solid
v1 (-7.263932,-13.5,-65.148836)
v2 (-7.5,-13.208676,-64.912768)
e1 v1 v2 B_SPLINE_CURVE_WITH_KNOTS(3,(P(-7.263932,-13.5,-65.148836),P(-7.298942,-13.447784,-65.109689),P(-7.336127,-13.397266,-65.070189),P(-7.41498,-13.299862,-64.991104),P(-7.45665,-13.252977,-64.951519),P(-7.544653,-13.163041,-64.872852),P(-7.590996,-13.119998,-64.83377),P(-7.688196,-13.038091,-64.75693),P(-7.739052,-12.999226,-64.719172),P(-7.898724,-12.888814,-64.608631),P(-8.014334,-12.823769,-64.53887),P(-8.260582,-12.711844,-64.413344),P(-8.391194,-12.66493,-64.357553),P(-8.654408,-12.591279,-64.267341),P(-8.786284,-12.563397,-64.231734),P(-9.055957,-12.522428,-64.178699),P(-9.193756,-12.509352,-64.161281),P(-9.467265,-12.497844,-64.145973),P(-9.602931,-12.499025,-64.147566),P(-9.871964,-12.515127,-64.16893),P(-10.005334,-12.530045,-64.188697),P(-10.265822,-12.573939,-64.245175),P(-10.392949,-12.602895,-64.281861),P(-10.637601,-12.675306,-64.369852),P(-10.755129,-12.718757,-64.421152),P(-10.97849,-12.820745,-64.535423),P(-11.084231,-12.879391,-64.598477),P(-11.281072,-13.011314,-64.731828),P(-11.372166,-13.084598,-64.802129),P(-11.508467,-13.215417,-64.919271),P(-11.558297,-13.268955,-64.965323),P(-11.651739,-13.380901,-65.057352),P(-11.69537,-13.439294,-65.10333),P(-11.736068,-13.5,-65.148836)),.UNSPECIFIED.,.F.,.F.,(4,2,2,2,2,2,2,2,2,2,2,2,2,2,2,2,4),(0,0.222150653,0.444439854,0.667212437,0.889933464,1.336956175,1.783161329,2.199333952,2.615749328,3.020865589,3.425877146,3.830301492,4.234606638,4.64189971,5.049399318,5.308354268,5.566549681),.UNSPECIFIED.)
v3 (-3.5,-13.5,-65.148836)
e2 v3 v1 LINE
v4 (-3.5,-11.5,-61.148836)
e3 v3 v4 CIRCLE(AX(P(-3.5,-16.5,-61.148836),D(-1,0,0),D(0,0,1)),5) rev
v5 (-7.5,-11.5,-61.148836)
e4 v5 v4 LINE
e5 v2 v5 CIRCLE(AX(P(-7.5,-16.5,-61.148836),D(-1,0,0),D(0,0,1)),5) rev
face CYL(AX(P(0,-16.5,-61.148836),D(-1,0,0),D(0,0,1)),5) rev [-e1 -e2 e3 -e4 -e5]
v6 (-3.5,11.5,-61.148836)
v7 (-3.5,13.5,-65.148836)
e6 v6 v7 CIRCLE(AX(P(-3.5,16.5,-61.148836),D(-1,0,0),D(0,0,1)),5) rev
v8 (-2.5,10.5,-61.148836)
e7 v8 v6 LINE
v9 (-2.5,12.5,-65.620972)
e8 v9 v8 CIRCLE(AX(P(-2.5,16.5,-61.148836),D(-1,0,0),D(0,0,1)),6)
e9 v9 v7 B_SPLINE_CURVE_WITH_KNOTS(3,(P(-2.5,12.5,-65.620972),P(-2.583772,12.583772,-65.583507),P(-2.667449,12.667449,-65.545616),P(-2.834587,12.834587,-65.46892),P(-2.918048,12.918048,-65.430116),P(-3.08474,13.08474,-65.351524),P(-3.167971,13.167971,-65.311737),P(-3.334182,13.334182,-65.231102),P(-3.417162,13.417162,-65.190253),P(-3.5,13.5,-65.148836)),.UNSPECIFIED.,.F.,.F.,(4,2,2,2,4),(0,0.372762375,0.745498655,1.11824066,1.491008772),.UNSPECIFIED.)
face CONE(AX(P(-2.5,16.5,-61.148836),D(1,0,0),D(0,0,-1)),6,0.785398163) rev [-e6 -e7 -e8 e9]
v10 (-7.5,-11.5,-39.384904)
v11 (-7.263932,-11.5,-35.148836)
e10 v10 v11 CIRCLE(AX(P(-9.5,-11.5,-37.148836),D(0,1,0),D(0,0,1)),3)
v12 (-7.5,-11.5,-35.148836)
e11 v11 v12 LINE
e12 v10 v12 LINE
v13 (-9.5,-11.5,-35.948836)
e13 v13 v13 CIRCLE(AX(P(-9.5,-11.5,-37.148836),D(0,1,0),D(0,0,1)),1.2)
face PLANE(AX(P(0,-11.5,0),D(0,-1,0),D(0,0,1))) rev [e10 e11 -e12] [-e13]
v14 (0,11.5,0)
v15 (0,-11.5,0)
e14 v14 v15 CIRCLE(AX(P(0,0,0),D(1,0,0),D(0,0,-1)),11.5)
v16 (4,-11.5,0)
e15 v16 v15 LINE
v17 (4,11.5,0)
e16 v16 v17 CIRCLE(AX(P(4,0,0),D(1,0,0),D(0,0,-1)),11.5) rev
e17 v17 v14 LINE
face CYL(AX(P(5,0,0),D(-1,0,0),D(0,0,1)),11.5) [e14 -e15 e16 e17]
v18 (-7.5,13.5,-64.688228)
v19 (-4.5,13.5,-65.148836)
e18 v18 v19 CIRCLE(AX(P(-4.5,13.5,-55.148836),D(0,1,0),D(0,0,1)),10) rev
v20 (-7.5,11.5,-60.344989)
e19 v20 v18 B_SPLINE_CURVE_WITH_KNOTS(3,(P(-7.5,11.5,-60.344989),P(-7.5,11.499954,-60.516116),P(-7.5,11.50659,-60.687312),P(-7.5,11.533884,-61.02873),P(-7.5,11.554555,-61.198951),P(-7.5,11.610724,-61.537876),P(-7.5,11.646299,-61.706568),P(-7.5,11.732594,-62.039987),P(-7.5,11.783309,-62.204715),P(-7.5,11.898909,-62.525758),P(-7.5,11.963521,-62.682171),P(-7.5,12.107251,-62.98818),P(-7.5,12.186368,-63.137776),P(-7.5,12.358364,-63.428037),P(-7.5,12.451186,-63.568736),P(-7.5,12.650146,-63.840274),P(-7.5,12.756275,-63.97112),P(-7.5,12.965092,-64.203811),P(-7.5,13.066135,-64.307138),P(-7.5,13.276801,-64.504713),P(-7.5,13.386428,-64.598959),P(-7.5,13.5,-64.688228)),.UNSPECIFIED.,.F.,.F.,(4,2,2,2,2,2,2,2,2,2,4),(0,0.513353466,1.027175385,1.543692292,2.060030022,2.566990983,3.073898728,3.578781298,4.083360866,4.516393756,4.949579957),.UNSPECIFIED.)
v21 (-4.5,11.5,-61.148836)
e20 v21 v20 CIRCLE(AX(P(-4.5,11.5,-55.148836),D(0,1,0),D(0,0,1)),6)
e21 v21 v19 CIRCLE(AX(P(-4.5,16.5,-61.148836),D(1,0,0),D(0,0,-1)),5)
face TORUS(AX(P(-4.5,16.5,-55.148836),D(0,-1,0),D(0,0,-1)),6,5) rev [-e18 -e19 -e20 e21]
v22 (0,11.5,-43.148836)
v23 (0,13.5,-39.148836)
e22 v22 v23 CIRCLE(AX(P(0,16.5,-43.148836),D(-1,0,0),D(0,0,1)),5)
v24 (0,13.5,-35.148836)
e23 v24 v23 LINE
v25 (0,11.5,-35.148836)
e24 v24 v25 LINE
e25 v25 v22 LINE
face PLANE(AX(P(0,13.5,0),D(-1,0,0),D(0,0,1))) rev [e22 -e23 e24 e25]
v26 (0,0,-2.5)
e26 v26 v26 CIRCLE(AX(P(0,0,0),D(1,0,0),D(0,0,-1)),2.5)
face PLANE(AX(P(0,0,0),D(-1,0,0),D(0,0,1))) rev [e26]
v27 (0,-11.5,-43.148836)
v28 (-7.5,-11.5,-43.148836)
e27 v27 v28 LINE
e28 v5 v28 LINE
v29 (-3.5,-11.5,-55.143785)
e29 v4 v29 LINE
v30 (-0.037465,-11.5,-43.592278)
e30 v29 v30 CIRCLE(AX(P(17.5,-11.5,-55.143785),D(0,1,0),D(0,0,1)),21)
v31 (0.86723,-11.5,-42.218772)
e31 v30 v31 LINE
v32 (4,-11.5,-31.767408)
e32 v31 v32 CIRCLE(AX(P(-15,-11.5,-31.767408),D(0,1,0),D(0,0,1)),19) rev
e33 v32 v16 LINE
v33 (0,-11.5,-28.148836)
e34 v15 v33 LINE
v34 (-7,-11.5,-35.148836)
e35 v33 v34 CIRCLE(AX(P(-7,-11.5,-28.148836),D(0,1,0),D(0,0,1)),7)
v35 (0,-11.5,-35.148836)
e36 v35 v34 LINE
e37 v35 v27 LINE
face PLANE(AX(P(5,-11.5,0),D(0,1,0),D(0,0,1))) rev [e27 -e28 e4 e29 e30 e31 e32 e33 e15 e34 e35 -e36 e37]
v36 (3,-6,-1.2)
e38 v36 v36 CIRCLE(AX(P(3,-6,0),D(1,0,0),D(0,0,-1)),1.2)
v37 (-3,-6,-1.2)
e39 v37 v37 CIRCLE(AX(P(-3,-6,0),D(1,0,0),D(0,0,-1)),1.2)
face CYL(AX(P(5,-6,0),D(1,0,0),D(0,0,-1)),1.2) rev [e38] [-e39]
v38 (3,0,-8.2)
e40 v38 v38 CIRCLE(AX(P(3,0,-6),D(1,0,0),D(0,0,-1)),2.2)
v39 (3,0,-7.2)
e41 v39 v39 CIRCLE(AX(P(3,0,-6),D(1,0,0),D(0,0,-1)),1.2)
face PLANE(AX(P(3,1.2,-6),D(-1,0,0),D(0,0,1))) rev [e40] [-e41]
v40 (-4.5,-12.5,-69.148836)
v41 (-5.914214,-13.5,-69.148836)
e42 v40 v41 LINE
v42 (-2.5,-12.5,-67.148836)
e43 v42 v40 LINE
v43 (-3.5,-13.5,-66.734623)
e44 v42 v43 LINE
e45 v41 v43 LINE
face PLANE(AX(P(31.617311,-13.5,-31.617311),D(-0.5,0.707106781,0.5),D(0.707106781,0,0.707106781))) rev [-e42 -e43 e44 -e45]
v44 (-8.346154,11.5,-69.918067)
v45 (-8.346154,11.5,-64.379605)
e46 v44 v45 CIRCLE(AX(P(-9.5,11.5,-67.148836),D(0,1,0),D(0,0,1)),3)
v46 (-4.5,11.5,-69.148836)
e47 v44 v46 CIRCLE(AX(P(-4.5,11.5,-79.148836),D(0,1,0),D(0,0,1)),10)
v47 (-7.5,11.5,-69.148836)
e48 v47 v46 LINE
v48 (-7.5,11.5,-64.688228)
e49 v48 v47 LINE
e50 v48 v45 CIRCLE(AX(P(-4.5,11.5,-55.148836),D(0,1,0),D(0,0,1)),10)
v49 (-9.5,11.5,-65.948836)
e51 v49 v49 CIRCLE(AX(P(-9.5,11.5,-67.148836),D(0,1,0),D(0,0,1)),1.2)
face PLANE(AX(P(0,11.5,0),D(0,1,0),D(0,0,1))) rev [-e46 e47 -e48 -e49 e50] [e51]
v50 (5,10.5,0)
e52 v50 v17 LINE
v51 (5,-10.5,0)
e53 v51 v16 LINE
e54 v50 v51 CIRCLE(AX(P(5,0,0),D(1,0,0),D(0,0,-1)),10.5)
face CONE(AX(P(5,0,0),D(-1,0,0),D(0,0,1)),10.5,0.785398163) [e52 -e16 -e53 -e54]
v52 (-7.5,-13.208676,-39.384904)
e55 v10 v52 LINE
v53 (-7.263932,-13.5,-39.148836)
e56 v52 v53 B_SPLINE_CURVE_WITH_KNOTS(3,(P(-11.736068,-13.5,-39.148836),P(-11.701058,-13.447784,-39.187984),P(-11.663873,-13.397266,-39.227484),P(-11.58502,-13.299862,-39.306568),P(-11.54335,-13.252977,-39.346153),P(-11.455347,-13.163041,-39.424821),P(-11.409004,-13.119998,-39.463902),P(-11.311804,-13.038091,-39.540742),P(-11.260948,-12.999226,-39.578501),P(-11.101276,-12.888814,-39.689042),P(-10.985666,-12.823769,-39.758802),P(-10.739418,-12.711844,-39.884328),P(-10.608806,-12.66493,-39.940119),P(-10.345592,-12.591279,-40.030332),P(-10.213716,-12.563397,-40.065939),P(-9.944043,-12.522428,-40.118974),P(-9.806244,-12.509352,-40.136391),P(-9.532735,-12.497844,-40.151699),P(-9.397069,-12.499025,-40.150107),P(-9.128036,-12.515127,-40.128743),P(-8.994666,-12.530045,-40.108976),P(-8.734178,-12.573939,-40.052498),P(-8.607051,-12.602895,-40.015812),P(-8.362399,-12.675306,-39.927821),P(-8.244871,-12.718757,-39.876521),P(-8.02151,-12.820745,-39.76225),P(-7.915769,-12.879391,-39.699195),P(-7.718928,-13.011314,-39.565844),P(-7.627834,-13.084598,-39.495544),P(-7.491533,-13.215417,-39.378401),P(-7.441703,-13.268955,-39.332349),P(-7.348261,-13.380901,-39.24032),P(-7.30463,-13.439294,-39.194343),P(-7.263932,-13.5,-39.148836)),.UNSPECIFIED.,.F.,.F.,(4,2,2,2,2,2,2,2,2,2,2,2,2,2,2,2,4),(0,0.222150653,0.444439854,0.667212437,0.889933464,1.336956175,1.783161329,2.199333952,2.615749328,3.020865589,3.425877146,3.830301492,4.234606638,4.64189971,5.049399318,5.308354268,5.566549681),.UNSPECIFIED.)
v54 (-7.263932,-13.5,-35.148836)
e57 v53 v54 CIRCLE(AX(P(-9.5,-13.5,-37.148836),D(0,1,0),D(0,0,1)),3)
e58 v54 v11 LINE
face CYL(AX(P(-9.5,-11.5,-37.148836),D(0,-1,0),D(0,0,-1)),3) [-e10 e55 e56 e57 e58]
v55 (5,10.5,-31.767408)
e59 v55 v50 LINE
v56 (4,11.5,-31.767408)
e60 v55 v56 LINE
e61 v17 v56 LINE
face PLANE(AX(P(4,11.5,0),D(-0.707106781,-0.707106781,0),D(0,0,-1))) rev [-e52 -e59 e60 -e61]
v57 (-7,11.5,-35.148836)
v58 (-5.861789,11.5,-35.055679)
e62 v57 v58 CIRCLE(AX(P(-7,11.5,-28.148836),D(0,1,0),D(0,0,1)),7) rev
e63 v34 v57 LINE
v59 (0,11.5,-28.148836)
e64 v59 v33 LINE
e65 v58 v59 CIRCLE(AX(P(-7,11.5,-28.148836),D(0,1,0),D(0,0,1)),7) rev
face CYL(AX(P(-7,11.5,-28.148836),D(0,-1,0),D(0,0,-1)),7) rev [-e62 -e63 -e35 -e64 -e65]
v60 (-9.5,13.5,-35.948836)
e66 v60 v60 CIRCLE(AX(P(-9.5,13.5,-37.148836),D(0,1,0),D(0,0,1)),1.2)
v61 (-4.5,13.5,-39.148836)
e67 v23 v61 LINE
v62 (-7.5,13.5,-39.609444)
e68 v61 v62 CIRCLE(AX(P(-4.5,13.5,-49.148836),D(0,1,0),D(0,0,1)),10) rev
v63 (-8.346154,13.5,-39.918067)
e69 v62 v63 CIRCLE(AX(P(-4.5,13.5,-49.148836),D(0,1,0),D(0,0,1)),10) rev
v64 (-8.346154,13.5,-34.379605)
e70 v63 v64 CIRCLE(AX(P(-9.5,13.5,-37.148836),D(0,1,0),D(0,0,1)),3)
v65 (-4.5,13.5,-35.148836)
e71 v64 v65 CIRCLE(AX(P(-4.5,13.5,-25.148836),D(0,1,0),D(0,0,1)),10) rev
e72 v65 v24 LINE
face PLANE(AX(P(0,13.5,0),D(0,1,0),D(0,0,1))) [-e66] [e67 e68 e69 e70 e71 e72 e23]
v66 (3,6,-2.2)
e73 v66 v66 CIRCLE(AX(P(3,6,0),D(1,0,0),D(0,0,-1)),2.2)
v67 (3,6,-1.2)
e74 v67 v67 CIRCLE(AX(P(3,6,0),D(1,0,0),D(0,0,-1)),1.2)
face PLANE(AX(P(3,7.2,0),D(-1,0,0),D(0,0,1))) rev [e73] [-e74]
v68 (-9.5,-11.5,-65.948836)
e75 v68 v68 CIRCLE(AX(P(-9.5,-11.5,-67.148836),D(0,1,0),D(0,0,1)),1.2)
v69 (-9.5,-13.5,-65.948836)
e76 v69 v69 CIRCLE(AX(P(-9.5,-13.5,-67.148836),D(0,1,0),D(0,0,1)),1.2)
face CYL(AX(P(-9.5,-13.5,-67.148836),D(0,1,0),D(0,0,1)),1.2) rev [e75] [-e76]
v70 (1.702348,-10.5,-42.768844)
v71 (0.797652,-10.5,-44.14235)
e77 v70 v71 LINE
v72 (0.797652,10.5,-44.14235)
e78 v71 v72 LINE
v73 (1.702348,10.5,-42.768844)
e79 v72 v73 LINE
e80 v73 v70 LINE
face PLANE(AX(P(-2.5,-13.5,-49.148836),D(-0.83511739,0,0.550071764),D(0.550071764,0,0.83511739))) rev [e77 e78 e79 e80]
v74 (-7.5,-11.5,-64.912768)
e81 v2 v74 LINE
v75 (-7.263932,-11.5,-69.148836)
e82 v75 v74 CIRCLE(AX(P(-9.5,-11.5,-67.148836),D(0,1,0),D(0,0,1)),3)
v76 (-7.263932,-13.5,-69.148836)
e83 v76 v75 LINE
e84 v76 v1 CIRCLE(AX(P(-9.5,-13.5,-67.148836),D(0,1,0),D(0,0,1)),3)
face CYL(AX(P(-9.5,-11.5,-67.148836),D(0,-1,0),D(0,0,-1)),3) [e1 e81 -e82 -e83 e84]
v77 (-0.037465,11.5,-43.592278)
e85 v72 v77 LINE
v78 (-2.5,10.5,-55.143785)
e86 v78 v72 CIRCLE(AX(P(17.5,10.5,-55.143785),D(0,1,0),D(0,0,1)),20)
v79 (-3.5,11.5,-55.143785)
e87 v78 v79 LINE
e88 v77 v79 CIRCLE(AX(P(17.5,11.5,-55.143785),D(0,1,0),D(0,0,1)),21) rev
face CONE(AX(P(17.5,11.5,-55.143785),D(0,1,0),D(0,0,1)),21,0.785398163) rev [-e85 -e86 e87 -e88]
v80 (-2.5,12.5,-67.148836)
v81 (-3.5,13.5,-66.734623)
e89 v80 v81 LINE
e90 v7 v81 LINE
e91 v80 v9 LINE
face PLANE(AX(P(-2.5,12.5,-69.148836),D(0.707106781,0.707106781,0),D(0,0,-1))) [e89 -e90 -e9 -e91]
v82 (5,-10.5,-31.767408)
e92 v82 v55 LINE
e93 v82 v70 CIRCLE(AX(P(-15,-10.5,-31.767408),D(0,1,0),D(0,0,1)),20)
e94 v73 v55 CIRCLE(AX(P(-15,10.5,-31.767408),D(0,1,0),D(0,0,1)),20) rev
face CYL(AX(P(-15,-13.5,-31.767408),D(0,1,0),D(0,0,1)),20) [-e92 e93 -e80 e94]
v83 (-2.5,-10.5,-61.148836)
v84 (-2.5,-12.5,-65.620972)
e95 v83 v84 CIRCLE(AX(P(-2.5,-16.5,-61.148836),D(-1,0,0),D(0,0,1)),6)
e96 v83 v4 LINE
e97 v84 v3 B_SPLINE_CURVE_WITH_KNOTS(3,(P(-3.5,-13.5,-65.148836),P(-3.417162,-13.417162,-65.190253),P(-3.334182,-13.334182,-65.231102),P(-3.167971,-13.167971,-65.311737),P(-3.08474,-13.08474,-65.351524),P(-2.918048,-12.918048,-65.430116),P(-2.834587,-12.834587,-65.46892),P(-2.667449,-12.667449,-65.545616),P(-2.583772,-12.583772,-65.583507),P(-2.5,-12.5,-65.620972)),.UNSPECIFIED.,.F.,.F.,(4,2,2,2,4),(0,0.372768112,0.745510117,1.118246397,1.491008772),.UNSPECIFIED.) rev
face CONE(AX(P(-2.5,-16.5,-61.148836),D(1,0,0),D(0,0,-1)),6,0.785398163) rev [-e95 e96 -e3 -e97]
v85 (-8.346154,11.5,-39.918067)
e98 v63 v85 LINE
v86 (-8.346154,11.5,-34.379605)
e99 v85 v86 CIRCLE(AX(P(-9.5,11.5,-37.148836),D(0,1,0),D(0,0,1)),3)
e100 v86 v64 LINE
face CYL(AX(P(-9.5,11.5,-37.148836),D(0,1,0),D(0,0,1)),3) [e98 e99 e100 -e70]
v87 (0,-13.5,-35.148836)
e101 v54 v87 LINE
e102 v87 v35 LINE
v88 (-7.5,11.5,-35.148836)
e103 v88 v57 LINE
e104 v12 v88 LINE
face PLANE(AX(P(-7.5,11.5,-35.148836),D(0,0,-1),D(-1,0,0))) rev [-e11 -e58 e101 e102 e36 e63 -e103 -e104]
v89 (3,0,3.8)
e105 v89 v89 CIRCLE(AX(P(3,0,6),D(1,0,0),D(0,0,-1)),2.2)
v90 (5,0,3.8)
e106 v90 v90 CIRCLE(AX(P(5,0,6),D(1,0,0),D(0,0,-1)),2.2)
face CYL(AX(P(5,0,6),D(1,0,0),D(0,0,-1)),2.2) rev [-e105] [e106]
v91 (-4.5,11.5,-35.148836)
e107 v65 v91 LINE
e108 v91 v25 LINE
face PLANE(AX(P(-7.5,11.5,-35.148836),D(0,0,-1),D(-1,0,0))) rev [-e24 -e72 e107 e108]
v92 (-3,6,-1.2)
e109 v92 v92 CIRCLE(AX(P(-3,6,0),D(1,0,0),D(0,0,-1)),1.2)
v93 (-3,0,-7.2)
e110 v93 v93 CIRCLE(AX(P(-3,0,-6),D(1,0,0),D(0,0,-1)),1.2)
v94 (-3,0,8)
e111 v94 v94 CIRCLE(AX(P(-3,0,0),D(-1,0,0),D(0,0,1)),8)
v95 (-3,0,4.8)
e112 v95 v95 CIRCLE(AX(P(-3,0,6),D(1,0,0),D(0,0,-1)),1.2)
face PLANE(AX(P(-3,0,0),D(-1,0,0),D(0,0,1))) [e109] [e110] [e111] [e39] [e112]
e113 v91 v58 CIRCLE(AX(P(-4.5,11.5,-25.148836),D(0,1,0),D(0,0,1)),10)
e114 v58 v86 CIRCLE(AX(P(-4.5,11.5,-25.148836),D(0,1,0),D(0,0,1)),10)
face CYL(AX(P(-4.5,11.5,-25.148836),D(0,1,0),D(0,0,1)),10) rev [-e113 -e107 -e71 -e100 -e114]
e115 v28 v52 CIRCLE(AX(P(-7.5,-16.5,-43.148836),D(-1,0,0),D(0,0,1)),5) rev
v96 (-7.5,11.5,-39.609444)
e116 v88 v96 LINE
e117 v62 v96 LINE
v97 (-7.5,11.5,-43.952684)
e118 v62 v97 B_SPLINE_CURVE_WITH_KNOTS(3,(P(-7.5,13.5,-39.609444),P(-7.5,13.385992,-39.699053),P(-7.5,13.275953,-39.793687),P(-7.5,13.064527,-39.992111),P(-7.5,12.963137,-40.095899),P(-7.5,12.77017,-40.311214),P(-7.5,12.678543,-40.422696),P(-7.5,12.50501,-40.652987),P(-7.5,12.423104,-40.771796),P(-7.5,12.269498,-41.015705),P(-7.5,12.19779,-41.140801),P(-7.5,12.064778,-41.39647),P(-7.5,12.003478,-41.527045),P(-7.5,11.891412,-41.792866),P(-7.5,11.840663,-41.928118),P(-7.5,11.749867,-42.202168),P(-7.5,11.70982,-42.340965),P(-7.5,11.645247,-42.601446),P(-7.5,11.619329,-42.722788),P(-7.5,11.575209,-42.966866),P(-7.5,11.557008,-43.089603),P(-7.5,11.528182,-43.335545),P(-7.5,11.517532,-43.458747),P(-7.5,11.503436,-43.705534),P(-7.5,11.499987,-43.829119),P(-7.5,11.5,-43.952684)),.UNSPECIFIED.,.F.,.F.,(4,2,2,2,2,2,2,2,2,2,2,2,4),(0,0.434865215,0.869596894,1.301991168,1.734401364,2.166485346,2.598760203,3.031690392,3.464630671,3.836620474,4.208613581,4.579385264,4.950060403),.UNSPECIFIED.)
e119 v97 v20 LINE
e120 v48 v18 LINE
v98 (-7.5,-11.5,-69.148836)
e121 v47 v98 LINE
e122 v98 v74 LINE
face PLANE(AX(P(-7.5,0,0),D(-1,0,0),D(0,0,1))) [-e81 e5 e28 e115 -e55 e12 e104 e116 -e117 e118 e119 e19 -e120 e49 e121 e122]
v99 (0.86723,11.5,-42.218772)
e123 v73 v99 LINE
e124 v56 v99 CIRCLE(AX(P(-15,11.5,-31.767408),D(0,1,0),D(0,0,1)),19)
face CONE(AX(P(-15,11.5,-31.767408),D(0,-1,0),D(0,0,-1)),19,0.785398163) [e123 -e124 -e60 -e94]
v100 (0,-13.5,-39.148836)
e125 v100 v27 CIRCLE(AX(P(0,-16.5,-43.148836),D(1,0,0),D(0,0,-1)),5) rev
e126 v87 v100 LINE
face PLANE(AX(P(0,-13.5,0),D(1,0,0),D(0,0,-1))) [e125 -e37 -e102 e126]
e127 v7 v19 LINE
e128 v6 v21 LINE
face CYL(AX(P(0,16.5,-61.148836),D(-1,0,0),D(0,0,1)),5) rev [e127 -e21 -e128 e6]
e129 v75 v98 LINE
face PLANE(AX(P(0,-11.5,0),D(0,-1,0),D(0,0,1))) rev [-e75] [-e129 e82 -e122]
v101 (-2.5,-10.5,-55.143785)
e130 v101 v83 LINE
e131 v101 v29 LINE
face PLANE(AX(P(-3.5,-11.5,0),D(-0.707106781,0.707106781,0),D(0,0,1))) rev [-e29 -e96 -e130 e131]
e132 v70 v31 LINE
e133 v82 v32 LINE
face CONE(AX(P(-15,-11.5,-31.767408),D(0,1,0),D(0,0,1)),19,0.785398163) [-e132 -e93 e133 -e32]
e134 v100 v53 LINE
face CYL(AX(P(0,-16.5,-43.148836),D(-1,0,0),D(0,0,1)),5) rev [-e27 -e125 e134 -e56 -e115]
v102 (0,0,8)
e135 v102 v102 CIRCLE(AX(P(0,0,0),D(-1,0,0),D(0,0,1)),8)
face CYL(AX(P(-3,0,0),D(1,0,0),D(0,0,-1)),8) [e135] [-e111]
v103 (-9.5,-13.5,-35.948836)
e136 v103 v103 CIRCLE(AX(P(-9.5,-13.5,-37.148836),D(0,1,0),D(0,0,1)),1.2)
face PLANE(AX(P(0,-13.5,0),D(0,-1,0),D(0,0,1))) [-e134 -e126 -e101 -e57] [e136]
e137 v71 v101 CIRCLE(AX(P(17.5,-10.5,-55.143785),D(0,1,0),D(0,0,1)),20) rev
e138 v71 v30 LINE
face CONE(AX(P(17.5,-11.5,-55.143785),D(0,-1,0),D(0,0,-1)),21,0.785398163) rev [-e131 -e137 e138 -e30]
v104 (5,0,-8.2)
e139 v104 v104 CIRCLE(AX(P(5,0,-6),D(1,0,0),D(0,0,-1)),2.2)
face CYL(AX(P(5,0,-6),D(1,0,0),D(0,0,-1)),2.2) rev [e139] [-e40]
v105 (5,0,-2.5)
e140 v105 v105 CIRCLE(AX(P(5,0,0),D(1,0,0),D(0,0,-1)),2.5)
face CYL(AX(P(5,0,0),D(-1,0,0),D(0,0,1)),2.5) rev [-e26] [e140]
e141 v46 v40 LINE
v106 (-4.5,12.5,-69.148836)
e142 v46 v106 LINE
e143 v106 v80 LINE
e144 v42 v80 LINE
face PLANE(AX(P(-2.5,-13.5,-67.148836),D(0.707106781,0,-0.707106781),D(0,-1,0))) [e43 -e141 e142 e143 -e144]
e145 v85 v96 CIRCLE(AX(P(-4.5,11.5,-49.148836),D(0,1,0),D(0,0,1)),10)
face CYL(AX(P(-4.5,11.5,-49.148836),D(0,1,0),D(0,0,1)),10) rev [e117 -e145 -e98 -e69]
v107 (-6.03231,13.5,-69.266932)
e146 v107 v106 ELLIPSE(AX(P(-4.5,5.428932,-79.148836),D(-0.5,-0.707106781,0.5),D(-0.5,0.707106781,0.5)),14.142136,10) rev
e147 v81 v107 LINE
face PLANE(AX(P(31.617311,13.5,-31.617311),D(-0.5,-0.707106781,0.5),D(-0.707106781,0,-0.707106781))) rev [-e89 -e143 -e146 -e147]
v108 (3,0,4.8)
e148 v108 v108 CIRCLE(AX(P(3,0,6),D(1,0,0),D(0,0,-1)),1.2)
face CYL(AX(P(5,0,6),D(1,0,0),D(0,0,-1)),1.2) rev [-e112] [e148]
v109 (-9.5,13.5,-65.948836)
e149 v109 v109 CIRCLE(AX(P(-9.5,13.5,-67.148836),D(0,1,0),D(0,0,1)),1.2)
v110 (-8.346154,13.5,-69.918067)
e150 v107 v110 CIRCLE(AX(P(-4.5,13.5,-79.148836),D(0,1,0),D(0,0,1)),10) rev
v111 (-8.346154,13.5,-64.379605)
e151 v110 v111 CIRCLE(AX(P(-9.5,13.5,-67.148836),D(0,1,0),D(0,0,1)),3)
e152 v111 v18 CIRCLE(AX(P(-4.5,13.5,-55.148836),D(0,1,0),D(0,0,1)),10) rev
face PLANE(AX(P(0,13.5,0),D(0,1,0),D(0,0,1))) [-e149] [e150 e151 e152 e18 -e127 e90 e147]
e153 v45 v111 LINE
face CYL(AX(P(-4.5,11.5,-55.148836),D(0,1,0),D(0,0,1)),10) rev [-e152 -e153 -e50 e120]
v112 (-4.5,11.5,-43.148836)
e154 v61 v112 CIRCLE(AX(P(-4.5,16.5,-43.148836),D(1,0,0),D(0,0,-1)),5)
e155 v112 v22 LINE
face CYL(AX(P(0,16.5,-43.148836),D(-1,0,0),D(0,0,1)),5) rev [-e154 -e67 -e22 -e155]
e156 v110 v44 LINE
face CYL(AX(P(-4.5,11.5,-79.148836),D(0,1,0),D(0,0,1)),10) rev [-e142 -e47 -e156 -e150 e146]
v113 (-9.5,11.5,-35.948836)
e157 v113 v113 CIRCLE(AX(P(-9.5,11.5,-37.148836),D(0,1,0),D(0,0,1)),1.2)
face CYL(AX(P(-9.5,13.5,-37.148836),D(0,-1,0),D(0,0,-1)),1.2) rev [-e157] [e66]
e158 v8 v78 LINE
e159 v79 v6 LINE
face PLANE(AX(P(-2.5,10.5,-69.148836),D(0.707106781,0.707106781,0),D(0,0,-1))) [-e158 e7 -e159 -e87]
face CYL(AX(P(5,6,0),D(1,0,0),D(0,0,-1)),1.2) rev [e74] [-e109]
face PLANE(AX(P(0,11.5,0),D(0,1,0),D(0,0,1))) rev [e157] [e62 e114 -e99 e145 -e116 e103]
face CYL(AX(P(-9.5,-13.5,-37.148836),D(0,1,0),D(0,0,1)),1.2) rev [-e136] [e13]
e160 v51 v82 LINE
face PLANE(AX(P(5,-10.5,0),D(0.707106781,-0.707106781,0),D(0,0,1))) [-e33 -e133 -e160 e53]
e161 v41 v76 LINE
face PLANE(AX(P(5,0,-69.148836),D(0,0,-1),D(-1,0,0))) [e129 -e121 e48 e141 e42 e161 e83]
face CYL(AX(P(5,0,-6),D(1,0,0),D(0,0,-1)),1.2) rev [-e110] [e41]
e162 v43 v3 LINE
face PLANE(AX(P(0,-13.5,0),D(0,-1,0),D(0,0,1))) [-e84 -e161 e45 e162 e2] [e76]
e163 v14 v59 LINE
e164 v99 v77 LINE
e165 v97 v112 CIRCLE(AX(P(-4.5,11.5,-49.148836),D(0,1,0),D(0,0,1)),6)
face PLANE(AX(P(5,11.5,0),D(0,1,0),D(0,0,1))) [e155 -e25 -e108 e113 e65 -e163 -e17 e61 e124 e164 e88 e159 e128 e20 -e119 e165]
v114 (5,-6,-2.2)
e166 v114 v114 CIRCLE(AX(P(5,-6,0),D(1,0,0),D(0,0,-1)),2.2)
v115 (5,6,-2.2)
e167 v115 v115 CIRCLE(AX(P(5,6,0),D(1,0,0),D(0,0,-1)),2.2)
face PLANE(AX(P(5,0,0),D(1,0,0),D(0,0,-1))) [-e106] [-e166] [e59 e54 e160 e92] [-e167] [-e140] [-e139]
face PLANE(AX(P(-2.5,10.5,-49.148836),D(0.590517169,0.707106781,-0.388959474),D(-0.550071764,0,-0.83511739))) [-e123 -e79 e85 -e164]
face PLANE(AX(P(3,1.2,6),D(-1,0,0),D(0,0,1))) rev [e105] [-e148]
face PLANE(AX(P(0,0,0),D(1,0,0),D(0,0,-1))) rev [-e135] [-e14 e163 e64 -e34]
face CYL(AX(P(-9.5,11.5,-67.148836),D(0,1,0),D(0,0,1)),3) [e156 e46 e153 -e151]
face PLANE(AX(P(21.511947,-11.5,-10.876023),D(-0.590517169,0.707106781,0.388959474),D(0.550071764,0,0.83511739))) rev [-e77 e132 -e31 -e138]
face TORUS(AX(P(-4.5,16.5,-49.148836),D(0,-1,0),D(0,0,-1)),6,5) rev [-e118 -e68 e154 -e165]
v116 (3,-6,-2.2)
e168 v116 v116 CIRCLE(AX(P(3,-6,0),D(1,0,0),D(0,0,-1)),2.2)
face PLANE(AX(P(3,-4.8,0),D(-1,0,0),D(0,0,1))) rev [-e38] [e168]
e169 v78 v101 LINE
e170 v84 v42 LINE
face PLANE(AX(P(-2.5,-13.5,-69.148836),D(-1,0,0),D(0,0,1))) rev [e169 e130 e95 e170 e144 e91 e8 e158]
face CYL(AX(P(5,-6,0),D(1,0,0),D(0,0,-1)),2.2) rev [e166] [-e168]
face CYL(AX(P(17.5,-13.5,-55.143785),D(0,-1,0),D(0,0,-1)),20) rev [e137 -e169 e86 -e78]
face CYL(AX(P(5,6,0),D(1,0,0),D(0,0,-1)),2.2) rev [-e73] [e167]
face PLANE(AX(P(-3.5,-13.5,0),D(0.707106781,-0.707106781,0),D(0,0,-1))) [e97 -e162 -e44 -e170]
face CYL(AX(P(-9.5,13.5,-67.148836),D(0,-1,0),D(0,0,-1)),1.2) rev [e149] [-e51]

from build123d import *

# Parameters (mm, degrees)
SKETCH1_R                      = 2.5
BOSS_EXTRUDE1_DEPTH            = 5
SKETCH7_R                      = 8
BOSS_EXTRUDE4_DEPTH            = 3
CBORE_FOR_M2_SHCS1_D           = 2.4
CBORE_FOR_M2_SHCS1_CBORE_D     = 4.4
CBORE_FOR_M2_SHCS1_CBORE_DEPTH = 2
SKETCH4_W                      = 34
SKETCH4_H                      = 23
BOSS_EXTRUDE2_DEPTH            = 7.5
SKETCH5_W                      = 7.5
SKETCH5_H                      = 4
SKETCH5_R                      = 1.2
BOSS_EXTRUDE3_DEPTH            = 2
CUT_EXTRUDE1_DEPTH             = 75.423192322
CUT_EXTRUDE1_DEPTH_BACK        = 75.423192322
SKETCH8_R                      = 3
SKETCH8_R_2                    = 1.2
BOSS_EXTRUDE5_DEPTH            = 2
FILLET4_R                      = 10
FILLET2_R                      = 20
FILLET3_R                      = 5
FILLET5_R                      = 7
CHAMFER4_SIZE                  = 2
CHAMFER1_SIZE                  = 1


with BuildPart() as part:
    # Sketch1 → Boss-Extrude1 (new body)
    with BuildSketch(Plane(origin=(0, 0, 0), x_dir=(0, 0, -1), z_dir=(1, 0, 0))):
        with BuildLine():
            ThreePointArc((0, 11.5), (-11.5, 0), (0, -11.5))
            Line((0, -11.5), (69.148836254, -11.5))
            Line((69.148836254, -11.5), (69.148836254, 11.5))
            Line((69.148836254, 11.5), (0, 11.5))
        make_face()
        Circle(SKETCH1_R, mode=Mode.SUBTRACT)
    extrude(amount=BOSS_EXTRUDE1_DEPTH)

    # Sketch7 → Boss-Extrude4 (add)
    with BuildSketch(Plane.ZY):
        Circle(SKETCH7_R)
    extrude(amount=BOSS_EXTRUDE4_DEPTH)

    # CBORE for M2 SHCS1 (through all)
    with Locations(Plane(origin=(5, 0, 0), x_dir=(0, 0, -1), z_dir=(1, 0, 0))):
        with Locations((-6, 0), (0, 6), (6, 0), (0, -6)):
            CounterBoreHole(CBORE_FOR_M2_SHCS1_D / 2, CBORE_FOR_M2_SHCS1_CBORE_D / 2, CBORE_FOR_M2_SHCS1_CBORE_DEPTH)

    # Sketch4 → Boss-Extrude2 (add)
    with BuildSketch(Plane.ZY):
        with Locations((-52.148836254, 0)):
            Rectangle(SKETCH4_W, SKETCH4_H)
    extrude(amount=BOSS_EXTRUDE2_DEPTH)

    # Sketch5 → Boss-Extrude3 (add)
    # profile 1 of 4: a face of its own
    with BuildSketch(Plane(origin=(0, 11.5, 0), x_dir=(1, 0, 0), z_dir=(0, 1, 0))):
        with Locations((-3.75, 37.148836254)):
            Rectangle(SKETCH5_W, SKETCH5_H)
    # profile 2 of 4: a face of its own
    with BuildSketch(Plane(origin=(0, 11.5, 0), x_dir=(1, 0, 0), z_dir=(0, 1, 0))):
        with BuildLine():
            Line((-7.5, 35.148836254), (-7.5, 39.148836254))
            Line((-7.5, 39.148836254), (-9.5, 39.148836254))
            ThreePointArc((-9.5, 39.148836254), (-11.5, 37.148836254), (-9.5, 35.148836254))
            Line((-9.5, 35.148836254), (-7.5, 35.148836254))
        make_face()
        with Locations(Location((-9.5, 37.148836254, 0), (0, 0, 270))):
            Circle(SKETCH5_R, mode=Mode.SUBTRACT)
    # profile 3 of 4: a face of its own
    with BuildSketch(Plane(origin=(0, 11.5, 0), x_dir=(1, 0, 0), z_dir=(0, 1, 0))):
        with Locations((-3.75, 67.148836254)):
            Rectangle(SKETCH5_W, SKETCH5_H)
    # profile 4 of 4: a face of its own
    with BuildSketch(Plane(origin=(0, 11.5, 0), x_dir=(1, 0, 0), z_dir=(0, 1, 0))):
        with BuildLine():
            Line((-7.5, 69.148836254), (-9.5, 69.148836254))
            ThreePointArc((-9.5, 69.148836254), (-11.5, 67.148836254), (-9.5, 65.148836254))
            Line((-9.5, 65.148836254), (-7.5, 65.148836254))
            Line((-7.5, 65.148836254), (-7.5, 69.148836254))
        make_face()
        with Locations(Location((-9.5, 67.148836254, 0), (0, 0, 270))):
            Circle(SKETCH5_R, mode=Mode.SUBTRACT)
    boss_extrude3 = extrude(amount=BOSS_EXTRUDE3_DEPTH)

    # Mirror1: Boss-Extrude3 across plane
    add(boss_extrude3.mirror(Plane.ZX))

    # Sketch6 → Cut-Extrude1 (cut, two sides: drawn at the far end of the back side and taken through both)
    with BuildSketch(Plane(origin=(0, 11.5, 0), x_dir=(1, 0, 0), z_dir=(0, 1, 0)).offset(-CUT_EXTRUDE1_DEPTH_BACK)):
        Polygon((-2.5, 69.148836254), (-2.5, 49.148836254), (5, 37.762357558), (5, 69.148836254), align=None)
    extrude(amount=CUT_EXTRUDE1_DEPTH + CUT_EXTRUDE1_DEPTH_BACK, mode=Mode.SUBTRACT)

    # Sketch8 → Boss-Extrude5 (add)
    # profile 1 of 2: a face of its own
    with BuildSketch(Plane(origin=(0, 13.5, 0), x_dir=(1, 0, 0), z_dir=(0, 1, 0))):
        with Locations((-9.5, 67.148836254)):
            Circle(SKETCH8_R)
        with Locations(Location((-9.5, 67.148836254, 0), (0, 0, 270))):
            Circle(SKETCH8_R_2, mode=Mode.SUBTRACT)
    # profile 2 of 2: a face of its own
    with BuildSketch(Plane(origin=(0, 13.5, 0), x_dir=(1, 0, 0), z_dir=(0, 1, 0))):
        with Locations((-9.5, 37.148836254)):
            Circle(SKETCH8_R)
        with Locations(Location((-9.5, 37.148836254, 0), (0, 0, 270))):
            Circle(SKETCH8_R_2, mode=Mode.SUBTRACT)
    boss_extrude5 = extrude(amount=-BOSS_EXTRUDE5_DEPTH)

    # Mirror2: Boss-Extrude5 across plane
    add(boss_extrude5.mirror(Plane.ZX))

    # Fillet4
    # the kernel refuses this fillet: 10 mm, written as the material it adds along each edge
    with BuildSketch(Plane(origin=(-7.263932023, 11.5, -69.148836254), x_dir=(-0.8150795156467411, 0, -0.5793491030225851), z_dir=(0, 1, 0))) as fillet4_piece_1:
        with BuildLine():
            CenterArc((3.540666656, -9.752076695), FILLET4_R, 102.784910078, 22.619864948)
            Line((-2.252824374, -1.601281538), (0, 0))
            ThreePointArc((0, 0), (0.663874998, -0.074376992), (1.327749996, 0))
        make_face()
    extrude(amount=2)
    with BuildSketch(Plane(origin=(-7.263932023, 11.5, -65.148836254), x_dir=(-0.8150795156467449, 0, 0.5793491030225799), z_dir=(0, 1, 0))) as fillet4_piece_2:
        with BuildLine():
            CenterArc((3.540666656, 9.752076695), FILLET4_R, 234.595224974, 22.619864948)
            Line((-2.252824374, 1.601281538), (0, 0))
            ThreePointArc((0, 0), (0.663874998, 0.074376992), (1.327749996, 0))
        make_face()
    extrude(amount=2)
    with BuildSketch(Plane(origin=(-7.263932023, 11.5, -35.148836254), x_dir=(1, 0, 0), z_dir=(0, 1, 0))) as fillet4_piece_3:
        with BuildLine():
            CenterArc((2.763932023, -10), FILLET4_R, 90, 22.619864948)
            ThreePointArc((-1.082221824, -0.769230769), (-0.498020668, -0.445238547), (0, 0))
            Line((0, 0), (2.763932023, 0))
        make_face()
    extrude(amount=2)
    with BuildSketch(Plane(origin=(-7.263932023, 11.5, -39.148836254), x_dir=(1, 0, 0), z_dir=(0, 1, 0))) as fillet4_piece_4:
        with BuildLine():
            CenterArc((2.763932023, 10), FILLET4_R, 247.380135052, 22.619864948)
            ThreePointArc((-1.082221824, 0.769230769), (-0.498020668, 0.445238547), (0, 0))
            Line((0, 0), (2.763932023, 0))
        make_face()
    extrude(amount=2)

    # Fillet2
    fillet2_edges = [part.edges().sort_by_distance(p)[0] for p in [
        (5, 0, -37.762357558),
        (-2.5, 0, -49.148836254),
    ]]
    fillet(fillet2_edges, radius=FILLET2_R)

    # Fillet3
    # the kernel refuses this fillet: 5 mm, written as the material it adds along each edge
    with BuildSketch(Plane(origin=(-4.5, 11.5, -65.148836254), x_dir=(0, 0, 1), z_dir=(1, 0, 0))) as fillet3_piece_1:
        with BuildLine():
            CenterArc((4, -5), FILLET3_R, 90, 53.130102354)
            Line((0, -2), (-0.08, -1.94))
            ThreePointArc((-0.08, -1.94), (-0.1, -1), (-0.1, 0))
            Line((-0.1, 0), (0, 0.1))
            Line((0, 0.1), (4, 0.1))
            Line((4, 0.1), (4, 0))
        make_face()
    extrude(amount=2)
    with BuildSketch(Plane(origin=(0, 11.5, -39.148836254), x_dir=(0, 0, -1), z_dir=(-1, 0, 0))) as fillet3_piece_2:
        with BuildLine():
            CenterArc((4, -5), FILLET3_R, 90, 53.130102354)
            Line((0, -2), (-0.08, -1.94))
            ThreePointArc((-0.08, -1.94), (-0.1, -1), (-0.1, 0))
            Line((-0.1, 0), (0, 0.1))
            Line((0, 0.1), (4, 0.1))
            Line((4, 0.1), (4, 0))
        make_face()
    extrude(amount=4.5)
    with BuildSketch(Plane(origin=(0, -11.5, -39.148836254), x_dir=(0, 0, -1), z_dir=(-1, 0, 0))) as fillet3_piece_3_section:
        with BuildLine():
            CenterArc((4, 5), FILLET3_R, 216.869897646, 53.130102354)
            Line((0, 2), (-0.08, 1.94))
            ThreePointArc((-0.08, 1.94), (-0.1, 1), (-0.1, 0))
            Line((-0.1, 0), (0, -0.1))
            Line((0, -0.1), (4, -0.1))
            Line((4, -0.1), (4, 0))
        make_face()
    fillet3_piece_3 = extrude(amount=17.263932023, mode=Mode.PRIVATE)
    fillet3_piece_3 = split(fillet3_piece_3, bisect_by=Plane(origin=(-7.5, -12.009955516, -40.183316128), z_dir=(1, 0, 0)), keep=Keep.TOP, mode=Mode.PRIVATE)
    add(fillet3_piece_3)
    with BuildSketch(Plane(origin=(-17.263932023, -11.5, -65.148836254), x_dir=(0, 0, 1), z_dir=(1, 0, 0))) as fillet3_piece_4_section:
        with BuildLine():
            CenterArc((4, 5), FILLET3_R, 216.869897646, 53.130102354)
            Line((0, 2), (-0.08, 1.94))
            ThreePointArc((-0.08, 1.94), (-0.1, 1), (-0.1, 0))
            Line((-0.1, 0), (0, -0.1))
            Line((0, -0.1), (4, -0.1))
            Line((4, -0.1), (4, 0))
        make_face()
    fillet3_piece_4 = extrude(amount=14.763932023, mode=Mode.PRIVATE)
    fillet3_piece_4 = split(fillet3_piece_4, bisect_by=Plane(origin=(-7.5, -12.00895453, -64.111805958), z_dir=(1, 0, 0)), keep=Keep.TOP, mode=Mode.PRIVATE)
    add(fillet3_piece_4)
    with BuildSketch(Plane(origin=(-4.5, 11.5, -55.148836254), x_dir=(0, 0, -1), z_dir=(1, 0, 0))) as fillet3_piece_5_section:
        with BuildLine():
            CenterArc((6, 5), FILLET3_R, 270, 53.130102354)
            Line((10, 2), (10.08, 1.94))
            ThreePointArc((10.08, 1.94), (10.1, 1), (10.1, 0))
            Line((10.1, 0), (10, -0.1))
            Line((10, -0.1), (6, -0.1))
            Line((6, -0.1), (6, 0))
        make_face()
    fillet3_piece_5 = revolve(axis=Axis((-4.5, 11.5, -55.148836254), (0, 1, 0)), revolution_arc=74.754248402, mode=Mode.PRIVATE)
    fillet3_piece_5 = split(fillet3_piece_5, bisect_by=Plane(origin=(-7.5, 12.098438569, -64.092030739), z_dir=(1, 0, 0)), keep=Keep.TOP, mode=Mode.PRIVATE)
    add(fillet3_piece_5)
    with BuildSketch(Plane(origin=(-4.5, 11.5, -49.148836254), x_dir=(-0.9648068245723973, 0, 0.2629596761074353), z_dir=(-0.2629596761074353, 0, -0.9648068245723973))) as fillet3_piece_6_section:
        with BuildLine():
            CenterArc((6, 5), FILLET3_R, 270, 53.130102354)
            Line((10, 2), (10.08, 1.94))
            ThreePointArc((10.08, 1.94), (10.1, 1), (10.1, 0))
            Line((10.1, 0), (10, -0.1))
            Line((10, -0.1), (6, -0.1))
            Line((6, -0.1), (6, 0))
        make_face()
    fillet3_piece_6 = revolve(axis=Axis((-4.5, 11.5, -49.148836254), (0, 1, 0)), revolution_arc=74.754248402, mode=Mode.PRIVATE)
    fillet3_piece_6 = split(fillet3_piece_6, bisect_by=Plane(origin=(-7.5, 12.098438572, -40.205641877), z_dir=(1, 0, 0)), keep=Keep.TOP, mode=Mode.PRIVATE)
    add(fillet3_piece_6)

    # Fillet5
    # the kernel refuses this fillet: 7 mm, written as the material it adds along each edge
    with BuildSketch(Plane(origin=(0, 11.5, -35.148836254), x_dir=(-1, 0, 0), z_dir=(0, -1, 0))) as fillet5_piece_1:
        with BuildLine():
            CenterArc((FILLET5_R, -FILLET5_R), FILLET5_R, 90, 90)
            Line((0, -FILLET5_R), (0, 0))
            Line((0, 0), (FILLET5_R, 0))
        make_face()
    extrude(amount=23)

    # Chamfer4
    chamfer4_edges = [part.edges().sort_by_distance(p)[0] for p in [
        (-2.5, 0, -69.148836254),
    ]]
    chamfer(chamfer4_edges, length=CHAMFER4_SIZE)

    # Chamfer1
    chamfer1_edges = [part.edges().sort_by_distance(p)[0] for p in [
        (5, 0, 11.5),
        (5, -11.5, -15.883704246),
        (5, 11.5, -15.883704246),
        (1.25, 11.5, -43.455596906),
        (1.25, -11.5, -43.455596906),
        (4.15785682, -11.5, -37.509927284),
        (4.15785682, 11.5, -37.509927284),
        (-1.65785682, 11.5, -49.401266528),
        (-1.65785682, -11.5, -49.401266528),
        (-2.5, 11.5, -58.146310787),
        (-2.5, -11.5, -58.146310787),
        (-2.5, -12.027864045, -63.384904232),
        (-2.5, 12.027864045, -63.384904232),
        (-2.5, 13.5, -66.148836254),
        (-2.5, -13.5, -66.148836254),
        (-3.5, 13.5, -68.148836254),
        (-3.5, -13.5, -68.148836254),
    ]]
    chamfer(chamfer1_edges, length=CHAMFER1_SIZE)


solid = part.part
